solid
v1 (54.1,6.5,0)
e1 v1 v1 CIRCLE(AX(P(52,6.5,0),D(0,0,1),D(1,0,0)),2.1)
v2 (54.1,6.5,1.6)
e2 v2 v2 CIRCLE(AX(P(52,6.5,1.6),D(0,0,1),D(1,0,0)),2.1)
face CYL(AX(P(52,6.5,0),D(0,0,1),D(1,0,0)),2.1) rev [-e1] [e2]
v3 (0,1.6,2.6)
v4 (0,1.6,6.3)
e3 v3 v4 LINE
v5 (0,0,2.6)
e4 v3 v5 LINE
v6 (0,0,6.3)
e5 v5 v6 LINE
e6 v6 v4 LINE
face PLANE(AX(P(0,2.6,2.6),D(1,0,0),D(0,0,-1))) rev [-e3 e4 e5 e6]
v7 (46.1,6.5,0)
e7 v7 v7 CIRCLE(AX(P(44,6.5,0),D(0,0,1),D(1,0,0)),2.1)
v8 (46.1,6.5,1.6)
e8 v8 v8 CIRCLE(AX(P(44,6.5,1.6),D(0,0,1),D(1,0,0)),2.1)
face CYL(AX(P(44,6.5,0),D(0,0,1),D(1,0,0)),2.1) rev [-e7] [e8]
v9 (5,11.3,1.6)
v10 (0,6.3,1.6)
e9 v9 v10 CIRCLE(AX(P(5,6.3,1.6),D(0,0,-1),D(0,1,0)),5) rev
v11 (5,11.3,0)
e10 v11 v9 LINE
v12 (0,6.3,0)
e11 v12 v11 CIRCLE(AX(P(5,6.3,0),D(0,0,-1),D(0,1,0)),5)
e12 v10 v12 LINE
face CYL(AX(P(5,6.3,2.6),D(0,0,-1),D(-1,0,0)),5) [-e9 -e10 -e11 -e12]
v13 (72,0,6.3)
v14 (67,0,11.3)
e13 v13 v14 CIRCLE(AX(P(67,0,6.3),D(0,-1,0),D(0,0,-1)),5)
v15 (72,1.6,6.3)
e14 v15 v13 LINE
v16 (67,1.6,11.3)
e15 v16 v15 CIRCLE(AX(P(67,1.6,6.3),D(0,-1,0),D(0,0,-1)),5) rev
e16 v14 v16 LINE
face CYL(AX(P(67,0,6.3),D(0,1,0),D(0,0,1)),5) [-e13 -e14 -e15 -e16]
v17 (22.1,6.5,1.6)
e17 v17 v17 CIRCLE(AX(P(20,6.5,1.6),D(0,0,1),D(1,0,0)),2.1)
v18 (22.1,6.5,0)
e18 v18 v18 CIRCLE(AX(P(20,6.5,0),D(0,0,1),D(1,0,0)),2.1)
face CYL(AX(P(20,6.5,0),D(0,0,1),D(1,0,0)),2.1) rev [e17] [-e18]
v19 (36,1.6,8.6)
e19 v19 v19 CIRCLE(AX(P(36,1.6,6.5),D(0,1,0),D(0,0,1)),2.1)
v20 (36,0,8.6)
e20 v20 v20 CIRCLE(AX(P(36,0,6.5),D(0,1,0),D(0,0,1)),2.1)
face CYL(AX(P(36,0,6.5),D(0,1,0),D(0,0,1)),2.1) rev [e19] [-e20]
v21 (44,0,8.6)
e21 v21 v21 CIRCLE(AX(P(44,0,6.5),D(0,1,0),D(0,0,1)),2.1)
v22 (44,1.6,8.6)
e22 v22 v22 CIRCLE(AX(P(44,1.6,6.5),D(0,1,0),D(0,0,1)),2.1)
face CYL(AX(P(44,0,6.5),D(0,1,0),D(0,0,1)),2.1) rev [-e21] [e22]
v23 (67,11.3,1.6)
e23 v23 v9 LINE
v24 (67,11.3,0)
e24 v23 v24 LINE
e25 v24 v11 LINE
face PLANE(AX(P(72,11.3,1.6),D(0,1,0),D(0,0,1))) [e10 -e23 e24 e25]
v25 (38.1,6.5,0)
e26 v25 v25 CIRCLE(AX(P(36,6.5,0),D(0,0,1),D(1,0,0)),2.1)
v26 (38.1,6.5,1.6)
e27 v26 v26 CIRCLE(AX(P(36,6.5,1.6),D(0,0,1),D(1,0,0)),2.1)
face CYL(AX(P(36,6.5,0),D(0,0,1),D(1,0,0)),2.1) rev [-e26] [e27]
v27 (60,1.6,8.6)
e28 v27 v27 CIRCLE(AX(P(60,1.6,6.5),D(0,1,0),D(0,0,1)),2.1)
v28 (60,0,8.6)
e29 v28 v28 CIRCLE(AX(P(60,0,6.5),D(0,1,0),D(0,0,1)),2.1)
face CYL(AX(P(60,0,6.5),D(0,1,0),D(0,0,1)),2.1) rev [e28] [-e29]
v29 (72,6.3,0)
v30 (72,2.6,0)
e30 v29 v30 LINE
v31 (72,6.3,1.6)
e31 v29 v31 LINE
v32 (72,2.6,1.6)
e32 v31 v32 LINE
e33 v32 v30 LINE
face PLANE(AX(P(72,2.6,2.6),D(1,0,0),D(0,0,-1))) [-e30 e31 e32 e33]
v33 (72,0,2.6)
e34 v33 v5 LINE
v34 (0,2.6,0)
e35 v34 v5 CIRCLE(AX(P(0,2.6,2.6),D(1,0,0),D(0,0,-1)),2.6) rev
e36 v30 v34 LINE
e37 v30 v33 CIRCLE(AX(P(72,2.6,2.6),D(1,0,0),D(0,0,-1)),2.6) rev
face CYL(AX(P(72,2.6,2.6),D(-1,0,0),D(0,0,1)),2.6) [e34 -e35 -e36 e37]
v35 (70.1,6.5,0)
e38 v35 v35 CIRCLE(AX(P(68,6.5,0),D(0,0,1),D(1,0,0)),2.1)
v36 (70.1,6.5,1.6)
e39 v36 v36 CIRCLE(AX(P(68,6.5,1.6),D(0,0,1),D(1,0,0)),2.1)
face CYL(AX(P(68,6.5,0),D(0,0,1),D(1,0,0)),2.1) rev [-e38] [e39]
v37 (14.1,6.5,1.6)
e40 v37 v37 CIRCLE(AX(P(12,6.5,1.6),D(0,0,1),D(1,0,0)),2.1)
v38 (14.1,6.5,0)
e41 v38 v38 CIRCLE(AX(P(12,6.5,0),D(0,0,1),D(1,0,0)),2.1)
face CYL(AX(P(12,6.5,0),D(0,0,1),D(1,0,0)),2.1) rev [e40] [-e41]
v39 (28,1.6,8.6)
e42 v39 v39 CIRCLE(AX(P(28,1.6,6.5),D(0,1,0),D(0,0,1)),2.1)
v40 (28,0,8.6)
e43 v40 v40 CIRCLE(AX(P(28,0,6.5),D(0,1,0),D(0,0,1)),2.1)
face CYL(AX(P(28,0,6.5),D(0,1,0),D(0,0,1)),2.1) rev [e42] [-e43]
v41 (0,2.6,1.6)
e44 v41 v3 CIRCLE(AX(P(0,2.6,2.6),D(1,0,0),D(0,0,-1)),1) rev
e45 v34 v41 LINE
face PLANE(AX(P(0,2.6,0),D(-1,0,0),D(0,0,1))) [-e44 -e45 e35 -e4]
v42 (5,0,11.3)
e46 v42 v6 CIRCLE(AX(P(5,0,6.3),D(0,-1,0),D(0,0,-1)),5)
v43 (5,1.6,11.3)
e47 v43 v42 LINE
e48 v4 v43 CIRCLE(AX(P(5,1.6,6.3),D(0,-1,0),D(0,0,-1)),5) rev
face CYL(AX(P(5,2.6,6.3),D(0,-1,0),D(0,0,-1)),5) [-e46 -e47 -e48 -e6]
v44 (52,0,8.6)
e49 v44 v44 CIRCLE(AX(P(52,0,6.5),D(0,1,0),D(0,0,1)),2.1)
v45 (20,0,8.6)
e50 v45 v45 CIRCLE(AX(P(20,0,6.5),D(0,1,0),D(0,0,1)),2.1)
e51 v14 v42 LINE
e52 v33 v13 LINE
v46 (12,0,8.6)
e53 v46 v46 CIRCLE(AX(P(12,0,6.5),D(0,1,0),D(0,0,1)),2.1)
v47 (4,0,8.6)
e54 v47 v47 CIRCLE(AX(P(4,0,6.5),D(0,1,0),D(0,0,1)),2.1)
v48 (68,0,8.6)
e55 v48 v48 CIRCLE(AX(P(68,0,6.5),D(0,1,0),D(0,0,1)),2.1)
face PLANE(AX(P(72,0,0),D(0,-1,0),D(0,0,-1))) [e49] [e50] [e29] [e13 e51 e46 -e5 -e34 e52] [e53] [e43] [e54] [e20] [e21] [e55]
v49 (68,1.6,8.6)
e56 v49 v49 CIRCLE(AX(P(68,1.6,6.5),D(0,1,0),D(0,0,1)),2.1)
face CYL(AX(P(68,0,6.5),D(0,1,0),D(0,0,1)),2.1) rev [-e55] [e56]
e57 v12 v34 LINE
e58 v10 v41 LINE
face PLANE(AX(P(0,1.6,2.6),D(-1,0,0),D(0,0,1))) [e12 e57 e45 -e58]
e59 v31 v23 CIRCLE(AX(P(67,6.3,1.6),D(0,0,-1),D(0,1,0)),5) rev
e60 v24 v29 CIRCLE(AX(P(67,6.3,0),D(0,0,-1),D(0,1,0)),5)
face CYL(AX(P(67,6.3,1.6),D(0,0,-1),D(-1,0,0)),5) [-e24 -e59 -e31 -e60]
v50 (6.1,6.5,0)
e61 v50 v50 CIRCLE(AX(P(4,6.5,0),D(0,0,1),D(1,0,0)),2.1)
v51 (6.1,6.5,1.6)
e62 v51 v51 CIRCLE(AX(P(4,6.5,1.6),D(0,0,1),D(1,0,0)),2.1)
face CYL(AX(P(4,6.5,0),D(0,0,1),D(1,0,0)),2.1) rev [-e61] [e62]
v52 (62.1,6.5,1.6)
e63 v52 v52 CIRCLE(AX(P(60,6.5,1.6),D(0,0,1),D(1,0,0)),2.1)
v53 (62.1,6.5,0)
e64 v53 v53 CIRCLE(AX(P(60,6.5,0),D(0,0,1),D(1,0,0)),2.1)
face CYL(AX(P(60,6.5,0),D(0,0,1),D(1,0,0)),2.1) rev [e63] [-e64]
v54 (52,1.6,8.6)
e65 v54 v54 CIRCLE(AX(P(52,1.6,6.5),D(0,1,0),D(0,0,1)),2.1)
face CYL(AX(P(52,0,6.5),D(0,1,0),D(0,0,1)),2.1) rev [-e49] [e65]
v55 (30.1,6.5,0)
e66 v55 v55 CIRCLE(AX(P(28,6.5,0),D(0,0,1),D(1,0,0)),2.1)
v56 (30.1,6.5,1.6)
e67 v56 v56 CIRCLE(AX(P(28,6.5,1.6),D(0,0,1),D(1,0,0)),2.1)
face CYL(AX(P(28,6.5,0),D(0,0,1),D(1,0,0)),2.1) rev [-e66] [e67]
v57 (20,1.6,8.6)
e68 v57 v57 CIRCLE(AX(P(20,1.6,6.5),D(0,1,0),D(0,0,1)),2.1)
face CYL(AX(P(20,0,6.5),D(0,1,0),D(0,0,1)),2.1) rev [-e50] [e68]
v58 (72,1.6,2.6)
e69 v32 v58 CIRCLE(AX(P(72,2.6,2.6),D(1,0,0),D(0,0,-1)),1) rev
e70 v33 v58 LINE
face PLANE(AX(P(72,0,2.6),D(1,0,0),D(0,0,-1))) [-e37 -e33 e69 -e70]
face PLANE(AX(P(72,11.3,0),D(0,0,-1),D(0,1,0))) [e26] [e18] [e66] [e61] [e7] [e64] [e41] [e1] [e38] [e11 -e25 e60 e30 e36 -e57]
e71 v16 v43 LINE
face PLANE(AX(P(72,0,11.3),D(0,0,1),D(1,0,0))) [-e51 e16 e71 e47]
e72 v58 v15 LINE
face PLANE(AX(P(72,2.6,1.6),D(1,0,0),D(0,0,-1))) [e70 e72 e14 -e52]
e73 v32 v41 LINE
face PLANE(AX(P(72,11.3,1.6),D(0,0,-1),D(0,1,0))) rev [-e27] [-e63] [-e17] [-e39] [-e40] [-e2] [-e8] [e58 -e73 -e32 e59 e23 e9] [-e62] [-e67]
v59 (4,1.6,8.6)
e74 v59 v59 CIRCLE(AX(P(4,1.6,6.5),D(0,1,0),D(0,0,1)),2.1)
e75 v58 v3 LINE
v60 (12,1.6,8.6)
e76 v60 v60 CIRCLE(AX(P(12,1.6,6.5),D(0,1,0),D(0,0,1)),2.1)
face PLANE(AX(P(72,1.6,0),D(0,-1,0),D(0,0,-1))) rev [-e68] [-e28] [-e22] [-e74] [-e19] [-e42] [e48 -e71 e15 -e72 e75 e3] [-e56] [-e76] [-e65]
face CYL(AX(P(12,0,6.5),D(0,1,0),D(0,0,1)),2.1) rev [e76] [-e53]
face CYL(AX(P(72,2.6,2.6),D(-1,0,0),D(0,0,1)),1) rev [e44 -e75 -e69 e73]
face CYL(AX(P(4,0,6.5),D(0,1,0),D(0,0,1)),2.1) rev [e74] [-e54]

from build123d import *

# Parameters (mm, degrees)
BASE_FLANGE1_DEPTH = 72
FILLET1_R          = 5
SKETCH6_R          = 2.1
CUT_EXTRUDE1_DEPTH = 74.524009684
SKETCH7_R          = 2.1
CUT_EXTRUDE2_DEPTH = 74.524009684
LPATTERN1_COUNT    = 9
LPATTERN1_PITCH    = 8


# Sheet-metal steps are written as plain solids
with BuildPart() as part:
    # Sketch1 → Base-Flange1 (new body)
    with BuildSketch(Plane(origin=(0, 0, 0), x_dir=(0, 0, -1), z_dir=(1, 0, 0))):
        with BuildLine():
            Line((0, 11.3), (0, 2.6))
            ThreePointArc((0, 2.6), (-0.761522369, 0.761522369), (-2.6, 0))
            Line((-2.6, 0), (-11.3, 0))
            Line((-11.3, 0), (-11.3, 1.6))
            Line((-11.3, 1.6), (-2.6, 1.6))
            ThreePointArc((-2.6, 1.6), (-1.892893219, 1.892893219), (-1.6, 2.6))
            Line((-1.6, 2.6), (-1.6, 11.3))
            Line((-1.6, 11.3), (0, 11.3))
        make_face()
    extrude(amount=BASE_FLANGE1_DEPTH)

    # Fillet1
    fillet1_edges = [part.edges().sort_by_distance(p)[0] for p in [
        (72, 11.3, 0.8),
        (72, 0.8, 11.3),
        (0, 11.3, 0.8),
        (0, 0.8, 11.3),
    ]]
    fillet(fillet1_edges, radius=FILLET1_R)

    # Sketch6 → Cut-Extrude1 (cut, through all)
    with BuildSketch(Plane.XY.offset(1.6)):
        with Locations((4, 6.5)):
            Circle(SKETCH6_R)
    cut_extrude1 = extrude(amount=-CUT_EXTRUDE1_DEPTH, mode=Mode.SUBTRACT)

    # Sketch7 → Cut-Extrude2 (cut, through all)
    with BuildSketch(Plane(origin=(0, 1.6, 0), x_dir=(1, 0, 0), z_dir=(0, 1, 0))):
        with Locations(Location((4, -6.5, 0), (0, 0, 270))):
            Circle(SKETCH7_R)
    cut_extrude2 = extrude(amount=-CUT_EXTRUDE2_DEPTH, mode=Mode.SUBTRACT)

    # LPattern1: Cut-Extrude1, Cut-Extrude2 ×9
    with Locations(*[(i * LPATTERN1_PITCH, 0, 0) for i in range(1, LPATTERN1_COUNT)]):
        add(cut_extrude1, mode=Mode.SUBTRACT)
        add(cut_extrude2, mode=Mode.SUBTRACT)


solid = part.part
